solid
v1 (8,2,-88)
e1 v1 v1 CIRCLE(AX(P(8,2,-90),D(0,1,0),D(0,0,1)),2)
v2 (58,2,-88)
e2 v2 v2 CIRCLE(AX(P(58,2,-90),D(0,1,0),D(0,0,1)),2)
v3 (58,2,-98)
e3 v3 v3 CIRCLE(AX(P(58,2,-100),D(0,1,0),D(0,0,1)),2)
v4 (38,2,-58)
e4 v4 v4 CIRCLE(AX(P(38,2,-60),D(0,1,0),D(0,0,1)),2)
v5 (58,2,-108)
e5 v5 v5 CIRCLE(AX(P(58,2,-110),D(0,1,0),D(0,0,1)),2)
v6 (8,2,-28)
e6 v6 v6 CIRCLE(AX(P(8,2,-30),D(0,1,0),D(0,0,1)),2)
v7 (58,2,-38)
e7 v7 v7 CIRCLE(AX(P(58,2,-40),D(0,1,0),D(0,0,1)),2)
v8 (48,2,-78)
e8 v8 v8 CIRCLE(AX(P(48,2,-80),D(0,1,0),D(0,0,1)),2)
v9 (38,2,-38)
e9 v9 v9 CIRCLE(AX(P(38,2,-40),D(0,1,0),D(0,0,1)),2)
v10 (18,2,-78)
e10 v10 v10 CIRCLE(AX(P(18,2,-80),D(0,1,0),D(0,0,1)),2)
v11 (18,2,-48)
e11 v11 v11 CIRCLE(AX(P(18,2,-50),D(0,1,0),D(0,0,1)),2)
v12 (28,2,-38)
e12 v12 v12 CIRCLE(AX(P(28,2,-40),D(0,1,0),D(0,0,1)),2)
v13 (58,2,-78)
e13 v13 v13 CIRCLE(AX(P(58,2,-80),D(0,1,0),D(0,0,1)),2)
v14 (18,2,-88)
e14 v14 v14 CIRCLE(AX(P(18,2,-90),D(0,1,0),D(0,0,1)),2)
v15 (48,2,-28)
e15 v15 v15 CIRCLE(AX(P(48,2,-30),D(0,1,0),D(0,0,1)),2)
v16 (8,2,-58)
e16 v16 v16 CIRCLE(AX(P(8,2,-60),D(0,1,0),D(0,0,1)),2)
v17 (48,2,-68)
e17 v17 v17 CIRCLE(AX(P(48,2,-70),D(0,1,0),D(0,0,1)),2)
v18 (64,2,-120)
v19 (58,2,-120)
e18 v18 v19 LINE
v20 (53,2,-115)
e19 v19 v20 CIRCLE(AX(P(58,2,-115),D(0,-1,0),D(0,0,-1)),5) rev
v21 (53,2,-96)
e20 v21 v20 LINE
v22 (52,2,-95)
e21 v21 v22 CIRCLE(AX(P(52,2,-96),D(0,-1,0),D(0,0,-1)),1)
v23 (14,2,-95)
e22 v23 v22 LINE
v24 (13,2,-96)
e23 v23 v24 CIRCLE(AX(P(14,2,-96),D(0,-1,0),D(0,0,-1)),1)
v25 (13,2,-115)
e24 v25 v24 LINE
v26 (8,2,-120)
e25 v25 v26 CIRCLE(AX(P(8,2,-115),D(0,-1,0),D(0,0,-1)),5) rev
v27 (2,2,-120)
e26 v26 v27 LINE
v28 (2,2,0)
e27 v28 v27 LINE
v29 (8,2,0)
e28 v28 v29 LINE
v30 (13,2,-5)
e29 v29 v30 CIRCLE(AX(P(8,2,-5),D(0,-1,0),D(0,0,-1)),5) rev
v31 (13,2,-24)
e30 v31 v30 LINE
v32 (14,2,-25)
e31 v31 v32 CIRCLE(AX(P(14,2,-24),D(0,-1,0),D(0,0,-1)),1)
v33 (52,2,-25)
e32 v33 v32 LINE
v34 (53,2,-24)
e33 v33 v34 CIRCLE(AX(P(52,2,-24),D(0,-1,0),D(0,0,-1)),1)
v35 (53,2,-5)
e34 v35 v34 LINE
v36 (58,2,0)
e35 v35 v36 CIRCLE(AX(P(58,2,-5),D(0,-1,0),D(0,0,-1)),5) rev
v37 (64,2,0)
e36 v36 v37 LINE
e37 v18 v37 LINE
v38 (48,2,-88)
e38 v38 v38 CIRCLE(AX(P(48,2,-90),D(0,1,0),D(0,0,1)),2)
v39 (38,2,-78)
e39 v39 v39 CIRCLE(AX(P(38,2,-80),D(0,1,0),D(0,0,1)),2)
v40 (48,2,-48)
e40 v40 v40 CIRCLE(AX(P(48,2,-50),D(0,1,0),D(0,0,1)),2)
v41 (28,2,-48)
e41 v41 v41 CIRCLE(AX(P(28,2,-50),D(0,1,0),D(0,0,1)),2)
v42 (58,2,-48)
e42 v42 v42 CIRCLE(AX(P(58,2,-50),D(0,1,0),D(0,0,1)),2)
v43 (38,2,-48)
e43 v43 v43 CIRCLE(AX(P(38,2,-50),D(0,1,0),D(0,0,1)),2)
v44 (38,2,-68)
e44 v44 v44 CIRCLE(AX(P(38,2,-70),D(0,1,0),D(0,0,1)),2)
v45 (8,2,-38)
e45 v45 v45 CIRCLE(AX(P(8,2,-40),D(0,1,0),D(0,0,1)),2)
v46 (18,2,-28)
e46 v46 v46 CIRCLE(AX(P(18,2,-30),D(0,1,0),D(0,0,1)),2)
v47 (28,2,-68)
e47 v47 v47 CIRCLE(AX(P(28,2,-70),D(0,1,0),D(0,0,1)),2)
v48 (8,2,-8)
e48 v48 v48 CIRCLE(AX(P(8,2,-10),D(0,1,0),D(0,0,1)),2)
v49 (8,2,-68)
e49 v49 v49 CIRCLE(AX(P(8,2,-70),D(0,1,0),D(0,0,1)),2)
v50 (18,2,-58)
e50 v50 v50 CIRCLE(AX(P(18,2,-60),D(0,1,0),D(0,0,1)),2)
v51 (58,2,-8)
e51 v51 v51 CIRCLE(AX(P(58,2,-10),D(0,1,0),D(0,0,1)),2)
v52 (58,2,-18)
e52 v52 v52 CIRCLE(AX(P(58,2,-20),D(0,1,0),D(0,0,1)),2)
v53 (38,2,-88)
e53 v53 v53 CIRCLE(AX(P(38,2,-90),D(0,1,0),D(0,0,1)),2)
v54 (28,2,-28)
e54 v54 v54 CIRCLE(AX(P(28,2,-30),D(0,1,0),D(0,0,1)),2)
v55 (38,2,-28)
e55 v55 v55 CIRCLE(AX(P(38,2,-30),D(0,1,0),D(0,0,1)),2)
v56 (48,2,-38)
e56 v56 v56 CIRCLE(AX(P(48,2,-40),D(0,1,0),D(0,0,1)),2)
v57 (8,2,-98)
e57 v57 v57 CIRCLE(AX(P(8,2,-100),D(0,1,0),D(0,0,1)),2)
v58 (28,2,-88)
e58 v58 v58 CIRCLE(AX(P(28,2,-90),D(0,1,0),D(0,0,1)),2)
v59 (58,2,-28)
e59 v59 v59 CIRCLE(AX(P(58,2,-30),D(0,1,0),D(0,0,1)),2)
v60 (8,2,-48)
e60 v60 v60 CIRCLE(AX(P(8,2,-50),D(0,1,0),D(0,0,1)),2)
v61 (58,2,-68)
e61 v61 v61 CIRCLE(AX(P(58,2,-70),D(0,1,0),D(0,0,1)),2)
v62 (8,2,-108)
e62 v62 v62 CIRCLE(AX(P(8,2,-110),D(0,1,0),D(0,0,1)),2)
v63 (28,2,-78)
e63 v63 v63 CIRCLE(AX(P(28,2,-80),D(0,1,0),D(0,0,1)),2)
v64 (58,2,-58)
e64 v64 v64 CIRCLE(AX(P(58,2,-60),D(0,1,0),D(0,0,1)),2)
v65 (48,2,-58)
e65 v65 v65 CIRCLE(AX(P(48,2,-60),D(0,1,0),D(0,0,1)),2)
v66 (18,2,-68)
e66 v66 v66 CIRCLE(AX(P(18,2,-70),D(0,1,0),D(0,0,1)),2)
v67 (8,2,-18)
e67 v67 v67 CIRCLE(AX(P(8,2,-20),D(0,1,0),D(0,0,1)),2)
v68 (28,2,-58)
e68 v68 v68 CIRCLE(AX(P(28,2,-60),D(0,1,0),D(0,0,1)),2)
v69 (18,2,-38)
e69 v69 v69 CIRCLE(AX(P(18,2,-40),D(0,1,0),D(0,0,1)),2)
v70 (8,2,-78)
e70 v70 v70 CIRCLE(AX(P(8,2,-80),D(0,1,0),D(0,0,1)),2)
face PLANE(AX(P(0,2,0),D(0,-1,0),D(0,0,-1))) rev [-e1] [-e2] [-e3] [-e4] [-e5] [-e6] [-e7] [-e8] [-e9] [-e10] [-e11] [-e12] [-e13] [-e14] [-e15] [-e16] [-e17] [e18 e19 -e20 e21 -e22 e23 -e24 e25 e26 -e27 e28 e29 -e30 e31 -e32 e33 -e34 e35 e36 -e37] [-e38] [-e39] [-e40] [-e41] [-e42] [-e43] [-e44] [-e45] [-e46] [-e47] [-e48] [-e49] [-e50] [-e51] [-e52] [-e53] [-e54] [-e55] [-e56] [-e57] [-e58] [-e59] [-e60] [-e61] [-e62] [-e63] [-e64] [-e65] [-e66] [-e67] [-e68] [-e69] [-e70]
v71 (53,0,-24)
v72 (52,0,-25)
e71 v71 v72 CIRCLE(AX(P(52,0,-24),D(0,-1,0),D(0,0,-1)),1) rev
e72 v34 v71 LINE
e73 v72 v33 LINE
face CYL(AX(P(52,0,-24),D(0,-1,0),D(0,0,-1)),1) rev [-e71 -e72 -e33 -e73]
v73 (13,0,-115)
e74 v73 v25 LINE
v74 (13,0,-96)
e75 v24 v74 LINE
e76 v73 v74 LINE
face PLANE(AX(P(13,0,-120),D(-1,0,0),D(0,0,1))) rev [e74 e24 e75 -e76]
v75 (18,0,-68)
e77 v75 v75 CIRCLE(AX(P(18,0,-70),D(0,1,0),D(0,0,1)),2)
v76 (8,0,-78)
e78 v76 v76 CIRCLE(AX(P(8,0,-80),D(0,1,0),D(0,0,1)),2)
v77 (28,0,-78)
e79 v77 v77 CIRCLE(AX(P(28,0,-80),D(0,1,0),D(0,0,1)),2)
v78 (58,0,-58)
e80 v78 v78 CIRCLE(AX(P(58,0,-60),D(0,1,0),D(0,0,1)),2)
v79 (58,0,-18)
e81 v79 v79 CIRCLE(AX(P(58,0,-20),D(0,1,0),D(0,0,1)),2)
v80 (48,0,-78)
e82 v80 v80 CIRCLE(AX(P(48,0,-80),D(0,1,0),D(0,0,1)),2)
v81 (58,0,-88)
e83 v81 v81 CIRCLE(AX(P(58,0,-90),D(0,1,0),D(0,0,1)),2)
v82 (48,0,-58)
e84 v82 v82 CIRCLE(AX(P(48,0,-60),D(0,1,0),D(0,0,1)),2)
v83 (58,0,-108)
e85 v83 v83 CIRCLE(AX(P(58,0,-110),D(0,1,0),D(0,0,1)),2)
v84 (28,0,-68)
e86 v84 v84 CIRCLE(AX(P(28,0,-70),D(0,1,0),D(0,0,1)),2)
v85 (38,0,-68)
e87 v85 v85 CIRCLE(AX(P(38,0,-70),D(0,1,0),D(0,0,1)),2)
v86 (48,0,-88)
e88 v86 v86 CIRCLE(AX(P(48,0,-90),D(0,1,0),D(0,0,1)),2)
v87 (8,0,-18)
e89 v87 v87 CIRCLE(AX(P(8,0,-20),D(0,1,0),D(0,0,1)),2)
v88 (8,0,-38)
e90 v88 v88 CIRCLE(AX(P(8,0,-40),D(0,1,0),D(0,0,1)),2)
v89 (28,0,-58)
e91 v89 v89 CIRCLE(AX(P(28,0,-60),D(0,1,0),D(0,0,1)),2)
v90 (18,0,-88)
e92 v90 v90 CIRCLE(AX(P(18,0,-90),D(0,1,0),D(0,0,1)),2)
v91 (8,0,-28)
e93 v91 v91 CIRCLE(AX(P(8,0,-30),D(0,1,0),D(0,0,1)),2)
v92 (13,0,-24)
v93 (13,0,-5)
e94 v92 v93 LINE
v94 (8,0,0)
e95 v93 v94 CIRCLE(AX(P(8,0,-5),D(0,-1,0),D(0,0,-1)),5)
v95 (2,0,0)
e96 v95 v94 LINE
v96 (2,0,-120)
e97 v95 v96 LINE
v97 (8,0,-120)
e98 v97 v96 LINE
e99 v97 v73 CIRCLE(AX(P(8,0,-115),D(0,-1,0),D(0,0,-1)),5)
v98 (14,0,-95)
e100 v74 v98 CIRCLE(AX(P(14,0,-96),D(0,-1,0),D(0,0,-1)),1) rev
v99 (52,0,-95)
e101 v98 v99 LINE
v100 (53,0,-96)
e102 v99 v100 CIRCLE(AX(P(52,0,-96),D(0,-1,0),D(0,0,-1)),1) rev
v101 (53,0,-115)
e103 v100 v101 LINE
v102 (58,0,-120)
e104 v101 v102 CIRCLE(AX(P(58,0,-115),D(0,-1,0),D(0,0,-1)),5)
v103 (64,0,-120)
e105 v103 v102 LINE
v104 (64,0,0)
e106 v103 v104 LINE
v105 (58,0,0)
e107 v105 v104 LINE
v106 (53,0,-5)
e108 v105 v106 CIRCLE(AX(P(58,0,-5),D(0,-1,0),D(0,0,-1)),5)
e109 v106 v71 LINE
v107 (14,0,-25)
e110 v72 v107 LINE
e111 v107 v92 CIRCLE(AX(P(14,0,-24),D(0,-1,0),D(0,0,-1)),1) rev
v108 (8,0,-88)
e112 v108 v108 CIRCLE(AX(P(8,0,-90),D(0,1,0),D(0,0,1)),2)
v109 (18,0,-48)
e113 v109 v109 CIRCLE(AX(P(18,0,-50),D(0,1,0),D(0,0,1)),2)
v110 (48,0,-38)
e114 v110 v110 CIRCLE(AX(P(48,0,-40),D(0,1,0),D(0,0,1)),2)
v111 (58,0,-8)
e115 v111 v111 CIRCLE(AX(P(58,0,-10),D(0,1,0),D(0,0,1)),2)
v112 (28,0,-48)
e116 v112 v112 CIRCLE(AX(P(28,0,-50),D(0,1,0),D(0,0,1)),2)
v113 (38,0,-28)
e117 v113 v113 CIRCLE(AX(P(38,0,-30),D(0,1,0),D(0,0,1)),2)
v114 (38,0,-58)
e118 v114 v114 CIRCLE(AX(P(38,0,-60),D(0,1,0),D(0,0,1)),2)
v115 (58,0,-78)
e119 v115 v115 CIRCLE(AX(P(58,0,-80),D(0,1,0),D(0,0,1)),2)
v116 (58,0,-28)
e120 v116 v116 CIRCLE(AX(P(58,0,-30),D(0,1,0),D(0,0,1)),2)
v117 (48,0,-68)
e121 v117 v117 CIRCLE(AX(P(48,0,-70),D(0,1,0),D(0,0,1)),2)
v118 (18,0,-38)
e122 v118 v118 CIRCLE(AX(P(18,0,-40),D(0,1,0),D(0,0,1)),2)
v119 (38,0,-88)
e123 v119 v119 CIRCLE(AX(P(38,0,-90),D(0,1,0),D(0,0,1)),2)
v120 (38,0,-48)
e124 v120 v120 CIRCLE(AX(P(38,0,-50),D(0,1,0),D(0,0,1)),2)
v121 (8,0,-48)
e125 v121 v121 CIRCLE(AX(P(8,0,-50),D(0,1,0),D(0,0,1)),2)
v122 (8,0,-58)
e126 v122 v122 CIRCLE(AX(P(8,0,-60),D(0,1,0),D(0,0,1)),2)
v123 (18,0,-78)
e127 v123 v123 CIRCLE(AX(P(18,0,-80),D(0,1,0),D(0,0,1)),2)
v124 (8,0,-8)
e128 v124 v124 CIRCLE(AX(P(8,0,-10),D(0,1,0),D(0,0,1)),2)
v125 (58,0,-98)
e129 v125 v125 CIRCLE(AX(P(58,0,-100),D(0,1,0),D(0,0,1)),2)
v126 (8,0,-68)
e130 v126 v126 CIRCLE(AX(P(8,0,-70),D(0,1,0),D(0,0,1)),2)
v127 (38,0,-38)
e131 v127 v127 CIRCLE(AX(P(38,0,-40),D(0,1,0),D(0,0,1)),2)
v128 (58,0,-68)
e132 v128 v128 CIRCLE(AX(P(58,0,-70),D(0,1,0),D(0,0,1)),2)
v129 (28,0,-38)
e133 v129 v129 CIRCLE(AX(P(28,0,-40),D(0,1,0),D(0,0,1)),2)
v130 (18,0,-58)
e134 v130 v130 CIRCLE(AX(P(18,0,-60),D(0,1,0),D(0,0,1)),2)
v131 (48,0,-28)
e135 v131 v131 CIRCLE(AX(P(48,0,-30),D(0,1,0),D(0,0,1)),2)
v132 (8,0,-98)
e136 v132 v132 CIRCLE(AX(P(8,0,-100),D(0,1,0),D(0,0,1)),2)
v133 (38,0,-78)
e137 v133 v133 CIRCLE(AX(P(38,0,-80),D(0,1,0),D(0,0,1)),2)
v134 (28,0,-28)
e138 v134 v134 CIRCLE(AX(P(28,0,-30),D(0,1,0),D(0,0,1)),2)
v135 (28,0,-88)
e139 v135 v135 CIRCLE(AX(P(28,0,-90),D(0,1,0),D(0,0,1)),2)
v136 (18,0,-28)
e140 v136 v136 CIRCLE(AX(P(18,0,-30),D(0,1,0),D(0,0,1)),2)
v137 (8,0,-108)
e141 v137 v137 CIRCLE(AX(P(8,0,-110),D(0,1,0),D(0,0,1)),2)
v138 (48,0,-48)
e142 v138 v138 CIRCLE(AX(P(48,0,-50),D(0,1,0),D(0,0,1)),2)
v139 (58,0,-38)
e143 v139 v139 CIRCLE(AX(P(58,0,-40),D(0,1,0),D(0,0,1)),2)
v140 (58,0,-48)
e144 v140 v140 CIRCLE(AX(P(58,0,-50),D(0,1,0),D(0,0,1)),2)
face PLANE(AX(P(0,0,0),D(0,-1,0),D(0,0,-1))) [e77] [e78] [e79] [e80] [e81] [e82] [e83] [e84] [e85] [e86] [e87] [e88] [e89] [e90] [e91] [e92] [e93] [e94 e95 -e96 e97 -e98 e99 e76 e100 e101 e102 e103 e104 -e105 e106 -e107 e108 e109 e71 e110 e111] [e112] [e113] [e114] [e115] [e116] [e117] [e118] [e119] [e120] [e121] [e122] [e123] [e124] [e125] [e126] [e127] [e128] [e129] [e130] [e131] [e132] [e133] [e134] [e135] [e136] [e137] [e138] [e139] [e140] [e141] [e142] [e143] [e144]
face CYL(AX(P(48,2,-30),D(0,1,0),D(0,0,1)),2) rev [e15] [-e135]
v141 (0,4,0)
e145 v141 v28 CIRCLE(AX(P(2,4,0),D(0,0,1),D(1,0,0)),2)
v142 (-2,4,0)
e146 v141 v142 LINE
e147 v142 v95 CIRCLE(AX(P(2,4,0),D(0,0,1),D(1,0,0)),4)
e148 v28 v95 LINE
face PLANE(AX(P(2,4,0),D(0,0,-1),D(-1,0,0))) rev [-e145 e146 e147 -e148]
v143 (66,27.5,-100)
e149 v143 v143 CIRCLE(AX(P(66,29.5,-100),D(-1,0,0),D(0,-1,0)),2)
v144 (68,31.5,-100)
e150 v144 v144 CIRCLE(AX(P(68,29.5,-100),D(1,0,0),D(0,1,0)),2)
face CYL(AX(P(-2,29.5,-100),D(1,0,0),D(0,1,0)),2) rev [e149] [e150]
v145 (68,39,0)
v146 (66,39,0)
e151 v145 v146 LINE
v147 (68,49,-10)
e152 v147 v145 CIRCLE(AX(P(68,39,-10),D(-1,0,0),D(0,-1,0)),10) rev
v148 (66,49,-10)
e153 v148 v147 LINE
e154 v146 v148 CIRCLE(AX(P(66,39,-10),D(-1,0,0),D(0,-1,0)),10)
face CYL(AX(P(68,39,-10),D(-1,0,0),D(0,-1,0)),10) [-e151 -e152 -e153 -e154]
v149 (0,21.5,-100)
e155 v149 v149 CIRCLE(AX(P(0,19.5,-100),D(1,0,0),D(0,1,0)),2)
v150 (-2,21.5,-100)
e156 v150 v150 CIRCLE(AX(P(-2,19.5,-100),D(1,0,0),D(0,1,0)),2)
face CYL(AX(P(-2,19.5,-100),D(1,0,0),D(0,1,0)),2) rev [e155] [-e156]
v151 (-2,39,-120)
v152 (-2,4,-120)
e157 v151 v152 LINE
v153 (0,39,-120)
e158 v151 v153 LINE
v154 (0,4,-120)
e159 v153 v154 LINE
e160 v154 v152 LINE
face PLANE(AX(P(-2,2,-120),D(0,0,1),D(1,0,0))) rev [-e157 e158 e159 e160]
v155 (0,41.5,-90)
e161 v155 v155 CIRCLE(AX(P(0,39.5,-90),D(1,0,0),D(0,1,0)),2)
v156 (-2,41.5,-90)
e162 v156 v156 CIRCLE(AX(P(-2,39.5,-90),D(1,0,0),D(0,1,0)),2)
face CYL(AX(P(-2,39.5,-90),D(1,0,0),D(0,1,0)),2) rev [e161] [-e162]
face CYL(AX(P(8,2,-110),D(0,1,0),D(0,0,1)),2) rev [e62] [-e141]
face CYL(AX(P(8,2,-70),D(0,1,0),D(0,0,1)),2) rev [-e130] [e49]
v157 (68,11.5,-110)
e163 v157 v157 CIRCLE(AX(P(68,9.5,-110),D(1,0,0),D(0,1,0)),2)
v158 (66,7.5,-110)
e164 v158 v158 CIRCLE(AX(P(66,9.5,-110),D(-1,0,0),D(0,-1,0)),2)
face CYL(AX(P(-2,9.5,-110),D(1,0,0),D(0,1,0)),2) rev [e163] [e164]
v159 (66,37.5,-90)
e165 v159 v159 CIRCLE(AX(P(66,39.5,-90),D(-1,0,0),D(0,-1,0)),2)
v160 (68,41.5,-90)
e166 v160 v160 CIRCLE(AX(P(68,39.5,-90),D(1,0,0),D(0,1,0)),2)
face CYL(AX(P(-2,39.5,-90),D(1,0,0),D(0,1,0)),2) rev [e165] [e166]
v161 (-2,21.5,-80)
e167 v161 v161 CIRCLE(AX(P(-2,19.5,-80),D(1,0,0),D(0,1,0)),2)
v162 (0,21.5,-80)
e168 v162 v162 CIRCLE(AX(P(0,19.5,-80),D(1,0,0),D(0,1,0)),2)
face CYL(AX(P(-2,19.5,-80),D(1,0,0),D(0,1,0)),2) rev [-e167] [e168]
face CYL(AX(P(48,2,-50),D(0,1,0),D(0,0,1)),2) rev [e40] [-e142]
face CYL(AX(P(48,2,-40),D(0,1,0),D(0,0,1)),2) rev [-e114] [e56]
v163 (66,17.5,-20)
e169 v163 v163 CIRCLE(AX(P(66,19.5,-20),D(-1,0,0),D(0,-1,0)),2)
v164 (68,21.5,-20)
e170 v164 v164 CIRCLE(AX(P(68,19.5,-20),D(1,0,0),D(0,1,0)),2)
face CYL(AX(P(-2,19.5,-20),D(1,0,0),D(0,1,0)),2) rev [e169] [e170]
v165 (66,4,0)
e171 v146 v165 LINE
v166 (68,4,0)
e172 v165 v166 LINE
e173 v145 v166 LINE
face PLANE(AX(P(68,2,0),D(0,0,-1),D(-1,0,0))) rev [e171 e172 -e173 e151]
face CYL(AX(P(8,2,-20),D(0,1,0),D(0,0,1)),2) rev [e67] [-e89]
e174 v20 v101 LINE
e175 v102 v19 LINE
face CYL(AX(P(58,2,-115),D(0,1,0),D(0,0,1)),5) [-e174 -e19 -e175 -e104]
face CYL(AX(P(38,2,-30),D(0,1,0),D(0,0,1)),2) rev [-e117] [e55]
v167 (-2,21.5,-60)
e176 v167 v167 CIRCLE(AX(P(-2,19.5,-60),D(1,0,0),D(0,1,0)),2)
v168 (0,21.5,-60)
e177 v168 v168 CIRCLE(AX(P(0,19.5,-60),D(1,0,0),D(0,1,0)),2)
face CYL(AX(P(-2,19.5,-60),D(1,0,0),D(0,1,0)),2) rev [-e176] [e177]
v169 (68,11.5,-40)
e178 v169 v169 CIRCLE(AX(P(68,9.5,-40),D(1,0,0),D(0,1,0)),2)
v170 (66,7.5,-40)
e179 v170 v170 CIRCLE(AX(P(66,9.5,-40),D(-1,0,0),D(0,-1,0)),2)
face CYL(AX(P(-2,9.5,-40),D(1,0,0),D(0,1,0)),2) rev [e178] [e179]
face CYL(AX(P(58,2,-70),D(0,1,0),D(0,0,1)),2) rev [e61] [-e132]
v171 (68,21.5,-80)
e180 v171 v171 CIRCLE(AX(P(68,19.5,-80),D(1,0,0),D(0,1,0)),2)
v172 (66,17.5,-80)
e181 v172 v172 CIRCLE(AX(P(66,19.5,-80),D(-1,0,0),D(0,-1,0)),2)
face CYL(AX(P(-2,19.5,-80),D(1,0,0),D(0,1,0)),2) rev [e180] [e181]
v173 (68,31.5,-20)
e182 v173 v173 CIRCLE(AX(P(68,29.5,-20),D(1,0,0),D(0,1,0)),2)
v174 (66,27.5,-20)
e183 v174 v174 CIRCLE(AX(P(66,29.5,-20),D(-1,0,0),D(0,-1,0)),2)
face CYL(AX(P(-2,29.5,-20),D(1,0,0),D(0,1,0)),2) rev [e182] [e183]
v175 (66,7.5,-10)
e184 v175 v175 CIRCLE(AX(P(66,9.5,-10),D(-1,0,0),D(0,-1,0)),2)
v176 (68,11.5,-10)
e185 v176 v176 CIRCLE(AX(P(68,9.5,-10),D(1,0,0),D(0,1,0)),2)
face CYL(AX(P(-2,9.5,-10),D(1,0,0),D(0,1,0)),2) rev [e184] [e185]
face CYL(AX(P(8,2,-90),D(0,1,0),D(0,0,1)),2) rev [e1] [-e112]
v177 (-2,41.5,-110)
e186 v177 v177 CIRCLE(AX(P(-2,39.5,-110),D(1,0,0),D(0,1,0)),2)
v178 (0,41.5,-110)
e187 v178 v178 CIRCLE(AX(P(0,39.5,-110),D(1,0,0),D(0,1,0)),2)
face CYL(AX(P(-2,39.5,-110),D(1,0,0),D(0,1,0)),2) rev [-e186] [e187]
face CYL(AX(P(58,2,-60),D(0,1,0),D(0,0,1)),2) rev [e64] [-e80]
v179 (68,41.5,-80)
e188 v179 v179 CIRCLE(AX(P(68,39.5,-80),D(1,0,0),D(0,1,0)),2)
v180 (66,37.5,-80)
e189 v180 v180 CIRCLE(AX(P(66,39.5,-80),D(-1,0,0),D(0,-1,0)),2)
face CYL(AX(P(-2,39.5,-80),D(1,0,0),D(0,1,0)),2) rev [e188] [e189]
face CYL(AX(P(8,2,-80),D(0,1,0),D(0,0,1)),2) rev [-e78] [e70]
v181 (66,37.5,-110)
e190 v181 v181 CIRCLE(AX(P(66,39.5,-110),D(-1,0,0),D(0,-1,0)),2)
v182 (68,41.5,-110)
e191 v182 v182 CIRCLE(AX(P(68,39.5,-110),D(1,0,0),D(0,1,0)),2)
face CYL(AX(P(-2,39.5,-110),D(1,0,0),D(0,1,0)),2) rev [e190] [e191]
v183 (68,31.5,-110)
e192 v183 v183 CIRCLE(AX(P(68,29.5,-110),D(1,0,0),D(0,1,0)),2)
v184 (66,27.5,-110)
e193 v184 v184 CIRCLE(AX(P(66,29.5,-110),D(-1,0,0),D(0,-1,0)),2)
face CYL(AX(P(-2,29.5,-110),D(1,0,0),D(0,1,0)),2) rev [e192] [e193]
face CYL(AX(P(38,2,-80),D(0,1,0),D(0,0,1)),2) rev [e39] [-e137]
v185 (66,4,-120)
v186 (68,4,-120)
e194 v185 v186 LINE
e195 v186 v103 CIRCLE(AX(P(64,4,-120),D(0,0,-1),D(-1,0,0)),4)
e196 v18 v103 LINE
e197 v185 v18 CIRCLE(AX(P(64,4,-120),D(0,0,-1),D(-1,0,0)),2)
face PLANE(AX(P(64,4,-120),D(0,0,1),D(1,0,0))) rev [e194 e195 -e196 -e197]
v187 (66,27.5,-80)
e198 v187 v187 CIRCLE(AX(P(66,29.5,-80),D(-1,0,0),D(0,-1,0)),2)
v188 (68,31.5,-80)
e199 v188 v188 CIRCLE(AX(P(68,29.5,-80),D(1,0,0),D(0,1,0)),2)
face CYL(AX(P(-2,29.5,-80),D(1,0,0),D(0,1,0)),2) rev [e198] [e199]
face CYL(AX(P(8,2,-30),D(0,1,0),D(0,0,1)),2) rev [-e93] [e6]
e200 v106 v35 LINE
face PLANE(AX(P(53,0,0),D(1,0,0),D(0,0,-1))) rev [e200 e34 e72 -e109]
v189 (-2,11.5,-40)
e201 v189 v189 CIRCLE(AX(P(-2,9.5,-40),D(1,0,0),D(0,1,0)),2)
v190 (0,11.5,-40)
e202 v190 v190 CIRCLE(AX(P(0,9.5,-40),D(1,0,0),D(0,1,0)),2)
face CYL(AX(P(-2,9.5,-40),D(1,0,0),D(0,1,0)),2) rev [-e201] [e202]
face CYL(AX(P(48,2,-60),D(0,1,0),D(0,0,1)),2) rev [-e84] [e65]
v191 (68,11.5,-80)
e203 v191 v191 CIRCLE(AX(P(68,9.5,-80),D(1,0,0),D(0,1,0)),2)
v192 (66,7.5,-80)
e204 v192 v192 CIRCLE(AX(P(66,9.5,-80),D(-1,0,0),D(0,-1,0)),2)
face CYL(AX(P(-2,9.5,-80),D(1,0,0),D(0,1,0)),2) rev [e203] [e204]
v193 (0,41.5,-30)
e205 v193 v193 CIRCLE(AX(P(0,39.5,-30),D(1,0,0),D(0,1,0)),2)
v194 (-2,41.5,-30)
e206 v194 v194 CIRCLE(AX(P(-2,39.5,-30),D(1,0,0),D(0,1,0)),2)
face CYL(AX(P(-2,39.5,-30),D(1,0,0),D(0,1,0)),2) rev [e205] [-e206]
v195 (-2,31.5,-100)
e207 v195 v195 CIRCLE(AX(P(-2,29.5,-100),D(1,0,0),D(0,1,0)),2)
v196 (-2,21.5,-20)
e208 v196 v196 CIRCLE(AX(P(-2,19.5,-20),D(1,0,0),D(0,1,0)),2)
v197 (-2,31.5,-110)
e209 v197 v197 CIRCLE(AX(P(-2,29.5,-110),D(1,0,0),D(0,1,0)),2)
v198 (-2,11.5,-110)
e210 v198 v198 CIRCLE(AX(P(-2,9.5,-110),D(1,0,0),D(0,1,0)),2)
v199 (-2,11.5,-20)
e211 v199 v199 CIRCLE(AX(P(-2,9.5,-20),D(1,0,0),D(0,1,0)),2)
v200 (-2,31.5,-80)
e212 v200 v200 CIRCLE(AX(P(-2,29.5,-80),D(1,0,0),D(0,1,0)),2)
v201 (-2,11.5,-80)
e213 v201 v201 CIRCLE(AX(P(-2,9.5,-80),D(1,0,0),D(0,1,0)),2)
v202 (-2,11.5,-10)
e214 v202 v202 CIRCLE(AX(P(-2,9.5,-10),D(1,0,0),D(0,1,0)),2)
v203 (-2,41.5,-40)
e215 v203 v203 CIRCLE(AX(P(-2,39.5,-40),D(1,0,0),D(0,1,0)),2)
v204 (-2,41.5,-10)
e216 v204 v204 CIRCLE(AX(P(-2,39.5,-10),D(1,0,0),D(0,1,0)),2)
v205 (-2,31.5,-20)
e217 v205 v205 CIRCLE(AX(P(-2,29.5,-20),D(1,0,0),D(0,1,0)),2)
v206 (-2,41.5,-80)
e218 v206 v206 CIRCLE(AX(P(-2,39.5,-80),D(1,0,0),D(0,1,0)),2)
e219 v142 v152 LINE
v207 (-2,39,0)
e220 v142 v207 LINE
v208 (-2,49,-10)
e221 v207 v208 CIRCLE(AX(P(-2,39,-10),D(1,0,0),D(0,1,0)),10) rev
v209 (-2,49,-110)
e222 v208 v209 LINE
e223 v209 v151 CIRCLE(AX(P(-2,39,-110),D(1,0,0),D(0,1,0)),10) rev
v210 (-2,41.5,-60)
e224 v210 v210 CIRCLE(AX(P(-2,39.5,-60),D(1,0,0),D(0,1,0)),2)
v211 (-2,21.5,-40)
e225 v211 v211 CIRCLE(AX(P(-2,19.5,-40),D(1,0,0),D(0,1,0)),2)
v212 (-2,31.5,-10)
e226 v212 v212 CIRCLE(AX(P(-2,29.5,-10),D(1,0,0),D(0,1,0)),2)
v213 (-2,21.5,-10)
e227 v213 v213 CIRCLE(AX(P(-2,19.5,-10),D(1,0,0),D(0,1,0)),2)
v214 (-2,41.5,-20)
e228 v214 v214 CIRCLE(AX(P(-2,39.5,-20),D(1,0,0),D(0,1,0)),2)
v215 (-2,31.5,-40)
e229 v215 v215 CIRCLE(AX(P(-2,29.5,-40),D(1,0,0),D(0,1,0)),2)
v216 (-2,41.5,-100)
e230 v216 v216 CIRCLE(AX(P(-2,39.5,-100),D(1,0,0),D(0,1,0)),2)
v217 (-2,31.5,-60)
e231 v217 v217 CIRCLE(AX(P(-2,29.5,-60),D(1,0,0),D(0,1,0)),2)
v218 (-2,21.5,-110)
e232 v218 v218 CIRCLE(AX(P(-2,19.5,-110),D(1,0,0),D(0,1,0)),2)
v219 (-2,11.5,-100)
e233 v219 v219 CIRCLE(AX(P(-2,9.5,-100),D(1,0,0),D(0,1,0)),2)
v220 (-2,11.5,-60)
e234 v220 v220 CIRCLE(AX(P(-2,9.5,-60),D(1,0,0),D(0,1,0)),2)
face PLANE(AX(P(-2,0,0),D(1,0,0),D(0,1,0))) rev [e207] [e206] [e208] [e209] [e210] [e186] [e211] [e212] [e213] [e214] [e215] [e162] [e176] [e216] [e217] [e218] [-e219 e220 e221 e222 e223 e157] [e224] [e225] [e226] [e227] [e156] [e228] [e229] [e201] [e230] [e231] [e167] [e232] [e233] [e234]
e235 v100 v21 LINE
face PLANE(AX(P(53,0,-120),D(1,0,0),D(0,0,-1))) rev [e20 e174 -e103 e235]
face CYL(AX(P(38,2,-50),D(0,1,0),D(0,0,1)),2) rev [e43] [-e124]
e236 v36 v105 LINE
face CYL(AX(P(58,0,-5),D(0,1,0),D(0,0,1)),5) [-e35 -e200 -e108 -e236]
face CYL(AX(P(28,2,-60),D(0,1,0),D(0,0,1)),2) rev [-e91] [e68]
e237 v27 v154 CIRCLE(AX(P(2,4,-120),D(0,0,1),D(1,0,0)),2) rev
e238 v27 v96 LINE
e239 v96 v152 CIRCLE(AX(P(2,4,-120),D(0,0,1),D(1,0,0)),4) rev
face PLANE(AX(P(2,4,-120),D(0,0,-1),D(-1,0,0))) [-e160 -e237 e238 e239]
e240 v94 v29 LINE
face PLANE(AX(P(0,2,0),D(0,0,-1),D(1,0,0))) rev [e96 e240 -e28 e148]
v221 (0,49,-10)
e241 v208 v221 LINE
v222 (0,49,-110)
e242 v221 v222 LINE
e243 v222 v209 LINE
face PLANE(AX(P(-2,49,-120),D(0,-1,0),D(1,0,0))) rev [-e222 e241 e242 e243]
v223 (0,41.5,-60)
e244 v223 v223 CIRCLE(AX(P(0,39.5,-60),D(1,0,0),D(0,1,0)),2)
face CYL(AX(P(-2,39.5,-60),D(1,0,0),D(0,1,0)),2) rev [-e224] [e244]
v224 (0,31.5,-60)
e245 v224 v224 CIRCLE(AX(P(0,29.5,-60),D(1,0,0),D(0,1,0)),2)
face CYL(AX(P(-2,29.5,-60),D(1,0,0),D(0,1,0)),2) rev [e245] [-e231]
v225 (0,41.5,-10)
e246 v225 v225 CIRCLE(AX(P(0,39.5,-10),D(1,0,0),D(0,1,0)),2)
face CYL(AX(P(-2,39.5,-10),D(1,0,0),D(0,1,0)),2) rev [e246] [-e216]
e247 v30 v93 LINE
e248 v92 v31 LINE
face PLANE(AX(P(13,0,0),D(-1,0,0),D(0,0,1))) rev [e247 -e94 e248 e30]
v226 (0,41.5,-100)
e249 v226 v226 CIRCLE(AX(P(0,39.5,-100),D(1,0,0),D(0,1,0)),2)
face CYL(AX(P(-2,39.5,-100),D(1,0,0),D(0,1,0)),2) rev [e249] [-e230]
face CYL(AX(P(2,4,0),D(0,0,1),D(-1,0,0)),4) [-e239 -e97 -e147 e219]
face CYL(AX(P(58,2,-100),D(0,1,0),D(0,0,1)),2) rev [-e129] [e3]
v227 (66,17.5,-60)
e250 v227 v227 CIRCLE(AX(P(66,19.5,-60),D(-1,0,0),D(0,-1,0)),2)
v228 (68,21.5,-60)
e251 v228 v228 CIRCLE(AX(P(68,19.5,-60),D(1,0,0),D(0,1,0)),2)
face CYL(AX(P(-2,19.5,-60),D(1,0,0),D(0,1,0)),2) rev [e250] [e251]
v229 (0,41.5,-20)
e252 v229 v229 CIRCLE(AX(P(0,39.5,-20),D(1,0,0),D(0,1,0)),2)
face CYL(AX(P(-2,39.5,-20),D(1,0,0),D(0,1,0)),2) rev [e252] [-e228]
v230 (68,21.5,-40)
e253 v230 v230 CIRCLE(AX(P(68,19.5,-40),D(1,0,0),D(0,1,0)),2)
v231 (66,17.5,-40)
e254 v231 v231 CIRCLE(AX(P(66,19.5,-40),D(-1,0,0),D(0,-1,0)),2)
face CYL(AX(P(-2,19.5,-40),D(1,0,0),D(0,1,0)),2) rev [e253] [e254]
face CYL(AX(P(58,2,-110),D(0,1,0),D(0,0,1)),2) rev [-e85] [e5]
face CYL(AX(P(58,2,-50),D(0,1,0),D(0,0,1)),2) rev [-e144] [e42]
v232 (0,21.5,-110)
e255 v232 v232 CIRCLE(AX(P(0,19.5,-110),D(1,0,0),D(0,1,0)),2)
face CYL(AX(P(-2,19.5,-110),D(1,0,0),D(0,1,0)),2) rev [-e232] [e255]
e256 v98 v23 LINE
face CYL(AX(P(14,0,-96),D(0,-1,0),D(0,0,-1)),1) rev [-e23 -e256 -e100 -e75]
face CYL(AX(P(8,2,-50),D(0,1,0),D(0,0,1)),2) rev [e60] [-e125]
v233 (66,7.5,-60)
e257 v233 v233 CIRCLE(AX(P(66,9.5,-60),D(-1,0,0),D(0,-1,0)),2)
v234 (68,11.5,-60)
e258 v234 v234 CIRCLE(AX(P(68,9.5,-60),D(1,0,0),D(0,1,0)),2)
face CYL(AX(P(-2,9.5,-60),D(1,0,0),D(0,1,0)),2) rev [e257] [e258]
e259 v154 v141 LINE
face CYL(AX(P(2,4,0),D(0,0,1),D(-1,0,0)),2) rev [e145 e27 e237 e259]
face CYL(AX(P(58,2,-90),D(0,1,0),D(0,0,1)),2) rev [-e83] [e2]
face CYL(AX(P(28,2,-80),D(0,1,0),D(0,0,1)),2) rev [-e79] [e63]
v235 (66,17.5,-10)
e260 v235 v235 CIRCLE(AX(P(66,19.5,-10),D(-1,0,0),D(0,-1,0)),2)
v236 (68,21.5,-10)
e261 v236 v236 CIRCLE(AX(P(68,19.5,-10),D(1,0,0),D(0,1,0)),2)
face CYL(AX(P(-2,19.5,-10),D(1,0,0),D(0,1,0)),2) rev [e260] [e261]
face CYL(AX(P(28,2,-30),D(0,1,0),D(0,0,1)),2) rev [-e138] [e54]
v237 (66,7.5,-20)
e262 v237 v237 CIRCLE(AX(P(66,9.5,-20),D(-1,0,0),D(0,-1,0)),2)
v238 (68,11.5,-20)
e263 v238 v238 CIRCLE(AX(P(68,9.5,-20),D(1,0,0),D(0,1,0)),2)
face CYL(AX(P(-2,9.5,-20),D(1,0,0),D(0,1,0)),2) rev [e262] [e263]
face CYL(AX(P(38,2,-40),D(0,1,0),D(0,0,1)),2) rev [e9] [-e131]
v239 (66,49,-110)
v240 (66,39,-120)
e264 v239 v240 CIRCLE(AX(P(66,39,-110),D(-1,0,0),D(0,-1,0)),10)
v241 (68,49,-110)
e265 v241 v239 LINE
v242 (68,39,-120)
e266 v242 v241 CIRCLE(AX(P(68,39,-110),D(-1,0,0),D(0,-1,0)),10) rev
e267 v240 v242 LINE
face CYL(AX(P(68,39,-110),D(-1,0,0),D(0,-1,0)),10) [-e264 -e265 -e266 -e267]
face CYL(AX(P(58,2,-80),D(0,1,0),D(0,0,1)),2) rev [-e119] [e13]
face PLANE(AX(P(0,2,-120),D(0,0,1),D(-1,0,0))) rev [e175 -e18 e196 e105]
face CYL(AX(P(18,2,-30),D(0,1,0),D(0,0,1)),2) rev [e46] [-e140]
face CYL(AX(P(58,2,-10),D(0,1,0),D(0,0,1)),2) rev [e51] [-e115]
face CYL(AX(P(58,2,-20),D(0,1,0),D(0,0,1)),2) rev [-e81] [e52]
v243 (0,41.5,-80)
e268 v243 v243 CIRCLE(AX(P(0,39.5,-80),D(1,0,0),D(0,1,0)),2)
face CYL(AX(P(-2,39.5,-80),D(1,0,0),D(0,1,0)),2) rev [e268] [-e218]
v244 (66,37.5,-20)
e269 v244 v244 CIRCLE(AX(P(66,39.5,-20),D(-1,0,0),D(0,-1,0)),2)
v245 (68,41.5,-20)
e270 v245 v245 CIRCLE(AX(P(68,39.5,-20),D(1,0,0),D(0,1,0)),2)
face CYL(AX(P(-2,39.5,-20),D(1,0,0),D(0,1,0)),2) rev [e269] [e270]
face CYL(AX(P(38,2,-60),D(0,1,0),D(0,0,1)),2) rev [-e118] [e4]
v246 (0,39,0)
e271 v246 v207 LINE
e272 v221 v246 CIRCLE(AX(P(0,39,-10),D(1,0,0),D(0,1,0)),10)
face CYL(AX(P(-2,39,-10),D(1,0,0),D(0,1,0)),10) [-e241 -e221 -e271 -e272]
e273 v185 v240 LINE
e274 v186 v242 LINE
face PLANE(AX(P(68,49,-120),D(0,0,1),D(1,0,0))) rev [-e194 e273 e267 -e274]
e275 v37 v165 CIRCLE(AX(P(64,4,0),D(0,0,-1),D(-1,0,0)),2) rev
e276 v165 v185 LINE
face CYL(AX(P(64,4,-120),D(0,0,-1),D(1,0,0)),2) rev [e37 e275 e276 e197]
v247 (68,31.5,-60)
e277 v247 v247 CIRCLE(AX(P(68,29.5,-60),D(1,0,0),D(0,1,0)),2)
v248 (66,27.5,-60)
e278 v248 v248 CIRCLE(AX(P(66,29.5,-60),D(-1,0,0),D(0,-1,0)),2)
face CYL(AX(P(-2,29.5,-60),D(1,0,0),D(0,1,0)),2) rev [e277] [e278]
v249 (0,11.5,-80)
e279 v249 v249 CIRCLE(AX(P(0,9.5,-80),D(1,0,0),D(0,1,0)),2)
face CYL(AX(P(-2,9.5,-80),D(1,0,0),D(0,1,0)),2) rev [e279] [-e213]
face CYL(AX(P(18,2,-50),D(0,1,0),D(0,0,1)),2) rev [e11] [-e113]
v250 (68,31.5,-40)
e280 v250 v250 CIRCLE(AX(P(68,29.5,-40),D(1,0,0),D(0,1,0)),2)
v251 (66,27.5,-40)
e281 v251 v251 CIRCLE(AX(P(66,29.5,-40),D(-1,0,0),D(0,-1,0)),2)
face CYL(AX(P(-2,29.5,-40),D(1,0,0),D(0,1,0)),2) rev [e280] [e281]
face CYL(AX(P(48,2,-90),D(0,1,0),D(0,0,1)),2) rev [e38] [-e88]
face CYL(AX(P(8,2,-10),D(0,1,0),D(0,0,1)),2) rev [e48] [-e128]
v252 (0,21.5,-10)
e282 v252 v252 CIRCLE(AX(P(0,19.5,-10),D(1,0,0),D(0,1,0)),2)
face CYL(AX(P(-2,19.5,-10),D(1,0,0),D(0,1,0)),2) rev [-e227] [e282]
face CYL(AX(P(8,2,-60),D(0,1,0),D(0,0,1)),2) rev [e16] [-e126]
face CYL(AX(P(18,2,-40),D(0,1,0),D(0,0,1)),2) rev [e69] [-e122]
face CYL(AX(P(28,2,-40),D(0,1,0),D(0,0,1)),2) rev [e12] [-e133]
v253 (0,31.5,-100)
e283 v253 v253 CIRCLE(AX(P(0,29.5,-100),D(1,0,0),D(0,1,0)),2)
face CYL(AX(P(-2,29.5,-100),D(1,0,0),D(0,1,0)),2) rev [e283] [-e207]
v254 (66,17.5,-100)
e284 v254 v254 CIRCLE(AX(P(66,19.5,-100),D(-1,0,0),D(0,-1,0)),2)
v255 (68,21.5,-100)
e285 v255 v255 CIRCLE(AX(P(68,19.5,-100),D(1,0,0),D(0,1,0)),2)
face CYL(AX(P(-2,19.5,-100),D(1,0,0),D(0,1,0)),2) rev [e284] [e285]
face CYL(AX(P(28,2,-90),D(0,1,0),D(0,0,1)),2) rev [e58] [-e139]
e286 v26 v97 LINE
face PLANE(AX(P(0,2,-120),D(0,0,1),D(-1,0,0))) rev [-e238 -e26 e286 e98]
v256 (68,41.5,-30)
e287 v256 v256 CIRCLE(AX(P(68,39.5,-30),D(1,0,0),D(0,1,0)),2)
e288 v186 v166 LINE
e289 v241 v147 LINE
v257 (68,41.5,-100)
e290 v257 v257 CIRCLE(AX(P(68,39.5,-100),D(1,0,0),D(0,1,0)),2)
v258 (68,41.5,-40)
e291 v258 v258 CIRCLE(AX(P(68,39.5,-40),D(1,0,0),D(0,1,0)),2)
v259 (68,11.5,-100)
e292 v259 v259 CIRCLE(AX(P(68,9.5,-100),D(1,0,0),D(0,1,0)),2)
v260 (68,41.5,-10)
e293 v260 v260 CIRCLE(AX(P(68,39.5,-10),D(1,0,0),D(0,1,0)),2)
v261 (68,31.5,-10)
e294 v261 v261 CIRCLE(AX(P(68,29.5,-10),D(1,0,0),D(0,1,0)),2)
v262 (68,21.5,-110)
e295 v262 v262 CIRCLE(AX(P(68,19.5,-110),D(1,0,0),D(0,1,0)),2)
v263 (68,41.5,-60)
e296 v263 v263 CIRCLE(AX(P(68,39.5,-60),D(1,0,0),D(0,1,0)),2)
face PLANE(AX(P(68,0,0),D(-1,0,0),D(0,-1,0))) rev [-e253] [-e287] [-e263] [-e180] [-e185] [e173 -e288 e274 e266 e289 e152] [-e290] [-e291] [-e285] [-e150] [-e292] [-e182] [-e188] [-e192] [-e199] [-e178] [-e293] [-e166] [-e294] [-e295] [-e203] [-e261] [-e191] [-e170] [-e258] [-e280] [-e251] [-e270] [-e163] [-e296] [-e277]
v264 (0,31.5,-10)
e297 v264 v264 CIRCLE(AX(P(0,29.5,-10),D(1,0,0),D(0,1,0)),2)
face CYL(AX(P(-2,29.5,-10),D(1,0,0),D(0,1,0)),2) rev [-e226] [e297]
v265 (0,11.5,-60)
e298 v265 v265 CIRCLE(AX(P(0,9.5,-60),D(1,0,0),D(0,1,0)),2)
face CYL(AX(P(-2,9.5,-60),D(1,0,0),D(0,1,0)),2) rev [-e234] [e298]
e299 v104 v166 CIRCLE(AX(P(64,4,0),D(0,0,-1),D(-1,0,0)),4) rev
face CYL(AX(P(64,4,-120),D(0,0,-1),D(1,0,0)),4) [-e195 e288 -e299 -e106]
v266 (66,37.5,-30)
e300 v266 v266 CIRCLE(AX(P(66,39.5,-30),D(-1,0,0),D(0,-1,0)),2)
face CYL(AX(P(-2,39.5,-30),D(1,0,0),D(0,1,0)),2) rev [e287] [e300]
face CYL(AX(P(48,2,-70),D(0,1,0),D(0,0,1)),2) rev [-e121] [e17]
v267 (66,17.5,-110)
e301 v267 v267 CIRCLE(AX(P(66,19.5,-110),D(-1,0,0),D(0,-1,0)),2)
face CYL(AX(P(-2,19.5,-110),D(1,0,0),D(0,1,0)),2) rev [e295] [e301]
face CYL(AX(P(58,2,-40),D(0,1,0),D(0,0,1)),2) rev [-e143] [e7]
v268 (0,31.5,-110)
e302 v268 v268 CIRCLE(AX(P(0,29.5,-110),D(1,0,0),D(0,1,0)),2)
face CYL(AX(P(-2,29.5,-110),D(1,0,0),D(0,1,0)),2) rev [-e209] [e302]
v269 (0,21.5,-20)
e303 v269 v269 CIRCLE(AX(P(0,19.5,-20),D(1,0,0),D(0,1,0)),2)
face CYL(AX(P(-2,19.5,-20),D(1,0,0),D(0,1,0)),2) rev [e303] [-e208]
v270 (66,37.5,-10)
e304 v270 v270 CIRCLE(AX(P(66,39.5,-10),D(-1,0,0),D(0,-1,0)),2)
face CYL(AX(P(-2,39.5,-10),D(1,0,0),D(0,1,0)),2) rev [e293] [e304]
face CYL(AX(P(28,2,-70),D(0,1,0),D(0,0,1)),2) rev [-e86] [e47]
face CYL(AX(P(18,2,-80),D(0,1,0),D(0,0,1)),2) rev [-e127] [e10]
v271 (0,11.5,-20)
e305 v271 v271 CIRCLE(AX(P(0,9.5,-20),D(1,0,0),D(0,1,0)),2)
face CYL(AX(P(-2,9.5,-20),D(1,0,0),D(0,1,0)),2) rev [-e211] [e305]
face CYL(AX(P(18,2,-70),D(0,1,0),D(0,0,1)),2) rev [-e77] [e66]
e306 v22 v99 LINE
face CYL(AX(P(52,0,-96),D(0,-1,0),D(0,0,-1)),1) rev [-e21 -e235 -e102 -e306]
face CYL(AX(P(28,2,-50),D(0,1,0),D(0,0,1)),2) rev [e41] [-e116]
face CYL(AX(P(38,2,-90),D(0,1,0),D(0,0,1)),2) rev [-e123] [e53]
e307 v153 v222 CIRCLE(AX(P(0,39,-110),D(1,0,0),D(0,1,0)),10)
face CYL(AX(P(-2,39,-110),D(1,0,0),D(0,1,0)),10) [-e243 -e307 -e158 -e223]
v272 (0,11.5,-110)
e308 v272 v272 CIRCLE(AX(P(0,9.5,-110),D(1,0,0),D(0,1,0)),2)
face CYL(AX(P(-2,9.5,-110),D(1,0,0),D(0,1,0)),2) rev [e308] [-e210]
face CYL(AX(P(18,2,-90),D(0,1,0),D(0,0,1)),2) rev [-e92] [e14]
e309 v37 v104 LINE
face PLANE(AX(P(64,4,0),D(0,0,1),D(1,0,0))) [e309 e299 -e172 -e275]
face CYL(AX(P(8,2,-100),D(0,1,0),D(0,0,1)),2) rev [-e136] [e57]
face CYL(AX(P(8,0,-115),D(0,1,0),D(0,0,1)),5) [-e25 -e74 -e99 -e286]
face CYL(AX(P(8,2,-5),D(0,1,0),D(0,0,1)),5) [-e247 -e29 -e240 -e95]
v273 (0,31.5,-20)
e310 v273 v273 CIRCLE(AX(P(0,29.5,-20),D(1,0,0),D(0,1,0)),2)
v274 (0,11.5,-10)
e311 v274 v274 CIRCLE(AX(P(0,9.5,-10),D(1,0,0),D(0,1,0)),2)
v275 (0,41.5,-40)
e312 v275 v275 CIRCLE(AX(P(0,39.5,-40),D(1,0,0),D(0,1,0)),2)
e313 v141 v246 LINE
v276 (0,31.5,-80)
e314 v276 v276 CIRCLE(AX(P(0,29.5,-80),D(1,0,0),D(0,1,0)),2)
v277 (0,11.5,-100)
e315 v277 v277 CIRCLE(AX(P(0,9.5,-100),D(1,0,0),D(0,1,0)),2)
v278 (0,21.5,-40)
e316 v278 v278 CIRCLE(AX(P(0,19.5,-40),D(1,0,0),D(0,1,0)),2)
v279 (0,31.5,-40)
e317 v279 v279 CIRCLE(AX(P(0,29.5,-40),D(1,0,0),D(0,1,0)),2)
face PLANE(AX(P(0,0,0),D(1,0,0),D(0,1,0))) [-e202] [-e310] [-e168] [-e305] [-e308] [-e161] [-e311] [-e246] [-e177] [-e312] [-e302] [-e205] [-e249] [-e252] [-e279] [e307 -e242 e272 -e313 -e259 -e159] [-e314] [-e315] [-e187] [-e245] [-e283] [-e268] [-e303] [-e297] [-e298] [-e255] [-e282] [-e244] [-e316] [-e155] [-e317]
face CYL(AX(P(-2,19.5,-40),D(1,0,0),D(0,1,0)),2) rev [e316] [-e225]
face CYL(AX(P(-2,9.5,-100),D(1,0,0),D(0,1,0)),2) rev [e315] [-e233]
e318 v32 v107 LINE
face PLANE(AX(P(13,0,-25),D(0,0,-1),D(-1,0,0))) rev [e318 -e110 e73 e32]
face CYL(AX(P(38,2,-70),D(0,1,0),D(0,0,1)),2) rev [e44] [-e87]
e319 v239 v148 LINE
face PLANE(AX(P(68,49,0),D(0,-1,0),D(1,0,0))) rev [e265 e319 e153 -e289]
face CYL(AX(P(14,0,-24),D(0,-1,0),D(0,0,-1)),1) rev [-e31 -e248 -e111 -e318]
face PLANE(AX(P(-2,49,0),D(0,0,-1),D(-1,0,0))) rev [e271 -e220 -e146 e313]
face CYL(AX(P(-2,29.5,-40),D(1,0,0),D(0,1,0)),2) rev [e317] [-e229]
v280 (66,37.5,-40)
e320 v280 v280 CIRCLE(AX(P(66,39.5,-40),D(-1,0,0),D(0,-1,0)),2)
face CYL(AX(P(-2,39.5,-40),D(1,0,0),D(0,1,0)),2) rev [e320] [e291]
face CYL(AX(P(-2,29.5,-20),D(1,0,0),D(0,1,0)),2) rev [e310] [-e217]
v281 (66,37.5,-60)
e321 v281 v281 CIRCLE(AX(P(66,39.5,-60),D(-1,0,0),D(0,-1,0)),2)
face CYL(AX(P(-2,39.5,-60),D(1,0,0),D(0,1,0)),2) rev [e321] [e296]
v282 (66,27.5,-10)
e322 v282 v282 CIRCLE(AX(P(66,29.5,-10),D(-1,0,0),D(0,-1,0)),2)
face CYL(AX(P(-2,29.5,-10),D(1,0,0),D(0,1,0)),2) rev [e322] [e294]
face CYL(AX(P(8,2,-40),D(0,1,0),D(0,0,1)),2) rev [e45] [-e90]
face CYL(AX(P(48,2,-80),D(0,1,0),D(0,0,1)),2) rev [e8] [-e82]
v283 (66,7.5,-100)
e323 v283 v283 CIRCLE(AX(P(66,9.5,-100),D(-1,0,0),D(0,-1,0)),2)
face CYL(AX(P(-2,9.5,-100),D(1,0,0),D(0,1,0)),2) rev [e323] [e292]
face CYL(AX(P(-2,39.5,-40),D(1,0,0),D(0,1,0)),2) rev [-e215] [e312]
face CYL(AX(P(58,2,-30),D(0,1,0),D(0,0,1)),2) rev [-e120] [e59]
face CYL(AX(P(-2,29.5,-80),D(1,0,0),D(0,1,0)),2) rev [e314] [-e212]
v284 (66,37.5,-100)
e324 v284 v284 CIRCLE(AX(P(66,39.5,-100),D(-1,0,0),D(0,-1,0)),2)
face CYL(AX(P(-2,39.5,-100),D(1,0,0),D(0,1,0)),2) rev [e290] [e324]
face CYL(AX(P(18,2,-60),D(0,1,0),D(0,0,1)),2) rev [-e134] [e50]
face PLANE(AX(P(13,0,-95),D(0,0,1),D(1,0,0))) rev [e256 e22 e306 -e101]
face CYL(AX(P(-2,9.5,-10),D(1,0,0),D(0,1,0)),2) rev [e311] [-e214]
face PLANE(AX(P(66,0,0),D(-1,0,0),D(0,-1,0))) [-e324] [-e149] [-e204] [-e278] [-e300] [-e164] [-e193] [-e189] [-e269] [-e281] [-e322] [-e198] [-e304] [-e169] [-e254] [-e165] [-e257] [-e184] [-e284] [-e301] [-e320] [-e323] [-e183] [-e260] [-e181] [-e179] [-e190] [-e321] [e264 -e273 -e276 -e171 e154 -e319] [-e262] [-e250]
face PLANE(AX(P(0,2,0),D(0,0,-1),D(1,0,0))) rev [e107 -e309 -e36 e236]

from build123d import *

# Parameters (mm, degrees)
SKETCH1_W                      = 66
SKETCH1_H                      = 120
BOSS_EXTRUDE1_DEPTH            = 2
SKETCH2_R                      = 2
CUT_EXTRUDE1_DEPTH             = 137.967149346
EDGE_FLANGE1_STRIP_W           = 12
EDGE_FLANGE1_STRIP_H           = 2
EDGE_FLANGE1_STRIP_CUT_DEPTH   = 120
EDGE_FLANGE1_STRIP_2_W         = 12
EDGE_FLANGE1_STRIP_2_H         = 2
EDGE_FLANGE1_STRIP_CUT_2_DEPTH = 120
EDGE_FLANGE1_DEPTH             = 120
EDGE_FLANGE1_BEND_DEPTH        = 120
SKETCH24_W                     = 40
SKETCH24_H                     = 25
CUT_EXTRUDE6_DEPTH             = 146.715476186
FILLET1_R                      = 10
FILLET2_R                      = 5
FILLET3_R                      = 1
SKETCH25_R                     = 2
CUT_EXTRUDE8_DEPTH             = 148.312592809


# Sheet-metal steps are written as plain solids
with BuildPart() as part:
    # Sketch1 → Boss-Extrude1 (new body)
    with BuildSketch(Plane(origin=(0, 0, 0), x_dir=(1, 0, 0), z_dir=(0, 1, 0))):
        with Locations((33, 60)):
            Rectangle(SKETCH1_W, SKETCH1_H)
    extrude(amount=BOSS_EXTRUDE1_DEPTH)

    # Sketch2 → Cut-Extrude1 (cut, through all)
    with BuildSketch(Plane(origin=(0, 2, 0), x_dir=(1, 0, 0), z_dir=(0, 1, 0))):
        with Locations(Location((8, 110, 0), (0, 0, 270))):
            Circle(SKETCH2_R)
        with Locations(Location((18, 110, 0), (0, 0, 270))):
            Circle(SKETCH2_R)
        with Locations(Location((28, 110, 0), (0, 0, 270))):
            Circle(SKETCH2_R)
        with Locations(Location((38, 110, 0), (0, 0, 270))):
            Circle(SKETCH2_R)
        with Locations(Location((48, 110, 0), (0, 0, 270))):
            Circle(SKETCH2_R)
        with Locations(Location((58, 110, 0), (0, 0, 270))):
            Circle(SKETCH2_R)
        with Locations(Location((18, 100, 0), (0, 0, 270))):
            Circle(SKETCH2_R)
        with Locations(Location((28, 100, 0), (0, 0, 270))):
            Circle(SKETCH2_R)
        with Locations(Location((38, 100, 0), (0, 0, 270))):
            Circle(SKETCH2_R)
        with Locations(Location((48, 100, 0), (0, 0, 270))):
            Circle(SKETCH2_R)
        with Locations(Location((58, 100, 0), (0, 0, 270))):
            Circle(SKETCH2_R)
        with Locations(Location((18, 90, 0), (0, 0, 270))):
            Circle(SKETCH2_R)
        with Locations(Location((28, 90, 0), (0, 0, 270))):
            Circle(SKETCH2_R)
        with Locations(Location((38, 90, 0), (0, 0, 270))):
            Circle(SKETCH2_R)
        with Locations(Location((48, 90, 0), (0, 0, 270))):
            Circle(SKETCH2_R)
        with Locations(Location((58, 90, 0), (0, 0, 270))):
            Circle(SKETCH2_R)
        with Locations(Location((18, 80, 0), (0, 0, 270))):
            Circle(SKETCH2_R)
        with Locations(Location((28, 80, 0), (0, 0, 270))):
            Circle(SKETCH2_R)
        with Locations(Location((38, 80, 0), (0, 0, 270))):
            Circle(SKETCH2_R)
        with Locations(Location((48, 80, 0), (0, 0, 270))):
            Circle(SKETCH2_R)
        with Locations(Location((58, 80, 0), (0, 0, 270))):
            Circle(SKETCH2_R)
        with Locations(Location((18, 70, 0), (0, 0, 270))):
            Circle(SKETCH2_R)
        with Locations(Location((28, 70, 0), (0, 0, 270))):
            Circle(SKETCH2_R)
        with Locations(Location((38, 70, 0), (0, 0, 270))):
            Circle(SKETCH2_R)
        with Locations(Location((48, 70, 0), (0, 0, 270))):
            Circle(SKETCH2_R)
        with Locations(Location((58, 70, 0), (0, 0, 270))):
            Circle(SKETCH2_R)
        with Locations(Location((18, 60, 0), (0, 0, 270))):
            Circle(SKETCH2_R)
        with Locations(Location((28, 60, 0), (0, 0, 270))):
            Circle(SKETCH2_R)
        with Locations(Location((38, 60, 0), (0, 0, 270))):
            Circle(SKETCH2_R)
        with Locations(Location((48, 60, 0), (0, 0, 270))):
            Circle(SKETCH2_R)
        with Locations(Location((58, 60, 0), (0, 0, 270))):
            Circle(SKETCH2_R)
        with Locations(Location((18, 50, 0), (0, 0, 270))):
            Circle(SKETCH2_R)
        with Locations(Location((28, 50, 0), (0, 0, 270))):
            Circle(SKETCH2_R)
        with Locations(Location((38, 50, 0), (0, 0, 270))):
            Circle(SKETCH2_R)
        with Locations(Location((48, 50, 0), (0, 0, 270))):
            Circle(SKETCH2_R)
        with Locations(Location((58, 50, 0), (0, 0, 270))):
            Circle(SKETCH2_R)
        with Locations(Location((18, 40, 0), (0, 0, 270))):
            Circle(SKETCH2_R)
        with Locations(Location((28, 40, 0), (0, 0, 270))):
            Circle(SKETCH2_R)
        with Locations(Location((38, 40, 0), (0, 0, 270))):
            Circle(SKETCH2_R)
        with Locations(Location((48, 40, 0), (0, 0, 270))):
            Circle(SKETCH2_R)
        with Locations(Location((58, 40, 0), (0, 0, 270))):
            Circle(SKETCH2_R)
        with Locations(Location((18, 30, 0), (0, 0, 270))):
            Circle(SKETCH2_R)
        with Locations(Location((28, 30, 0), (0, 0, 270))):
            Circle(SKETCH2_R)
        with Locations(Location((38, 30, 0), (0, 0, 270))):
            Circle(SKETCH2_R)
        with Locations(Location((48, 30, 0), (0, 0, 270))):
            Circle(SKETCH2_R)
        with Locations(Location((58, 30, 0), (0, 0, 270))):
            Circle(SKETCH2_R)
        with Locations(Location((18, 20, 0), (0, 0, 270))):
            Circle(SKETCH2_R)
        with Locations(Location((28, 20, 0), (0, 0, 270))):
            Circle(SKETCH2_R)
        with Locations(Location((38, 20, 0), (0, 0, 270))):
            Circle(SKETCH2_R)
        with Locations(Location((48, 20, 0), (0, 0, 270))):
            Circle(SKETCH2_R)
        with Locations(Location((58, 20, 0), (0, 0, 270))):
            Circle(SKETCH2_R)
        with Locations(Location((18, 10, 0), (0, 0, 270))):
            Circle(SKETCH2_R)
        with Locations(Location((28, 10, 0), (0, 0, 270))):
            Circle(SKETCH2_R)
        with Locations(Location((38, 10, 0), (0, 0, 270))):
            Circle(SKETCH2_R)
        with Locations(Location((48, 10, 0), (0, 0, 270))):
            Circle(SKETCH2_R)
        with Locations(Location((58, 10, 0), (0, 0, 270))):
            Circle(SKETCH2_R)
        with Locations(Location((8, 100, 0), (0, 0, 270))):
            Circle(SKETCH2_R)
        with Locations(Location((8, 90, 0), (0, 0, 270))):
            Circle(SKETCH2_R)
        with Locations(Location((8, 80, 0), (0, 0, 270))):
            Circle(SKETCH2_R)
        with Locations(Location((8, 70, 0), (0, 0, 270))):
            Circle(SKETCH2_R)
        with Locations(Location((8, 60, 0), (0, 0, 270))):
            Circle(SKETCH2_R)
        with Locations(Location((8, 50, 0), (0, 0, 270))):
            Circle(SKETCH2_R)
        with Locations(Location((8, 40, 0), (0, 0, 270))):
            Circle(SKETCH2_R)
        with Locations(Location((8, 30, 0), (0, 0, 270))):
            Circle(SKETCH2_R)
        with Locations(Location((8, 20, 0), (0, 0, 270))):
            Circle(SKETCH2_R)
        with Locations(Location((8, 10, 0), (0, 0, 270))):
            Circle(SKETCH2_R)
    extrude(amount=-CUT_EXTRUDE1_DEPTH, mode=Mode.SUBTRACT)

    # Edge-Flange1 strip (across the edge) → Edge-Flange1 strip cut (cut)
    with BuildSketch(Plane(origin=(0, 2, -120), x_dir=(1, 0, 0), z_dir=(0, 0, 1))):
        with Locations((-4, -1)):
            Rectangle(EDGE_FLANGE1_STRIP_W, EDGE_FLANGE1_STRIP_H)
    extrude(amount=EDGE_FLANGE1_STRIP_CUT_DEPTH, mode=Mode.SUBTRACT)

    # Edge-Flange1 strip 2 (across the edge) → Edge-Flange1 strip cut 2 (cut)
    with BuildSketch(Plane(origin=(66, 2, 0), x_dir=(-1, 0, 0), z_dir=(0, 0, -1))):
        with Locations((-4, -1)):
            Rectangle(EDGE_FLANGE1_STRIP_2_W, EDGE_FLANGE1_STRIP_2_H)
    extrude(amount=EDGE_FLANGE1_STRIP_CUT_2_DEPTH, mode=Mode.SUBTRACT)

    # Edge-Flange1 section (across the edge) → Edge-Flange1 (add)
    with BuildSketch(Plane(origin=(0, 2, -120), x_dir=(1, 0, 0), z_dir=(0, 0, 1))):
        with BuildLine():
            Line((-2, 2), (-2, 47))
            Line((-2, 47), (0, 47))
            Line((0, 47), (0, 2))
            ThreePointArc((0, 2), (0.585786438, 0.585786438), (2, 0))
            Line((2, 0), (2, -2))
            ThreePointArc((2, -2), (-0.828427125, -0.828427125), (-2, 2))
        make_face()
    extrude(amount=EDGE_FLANGE1_DEPTH)

    # Edge-Flange1 section 2 (across the edge) → Edge-Flange1 bend (add)
    with BuildSketch(Plane(origin=(66, 2, 0), x_dir=(-1, 0, 0), z_dir=(0, 0, -1))):
        with BuildLine():
            Line((-2, 2), (-2, 47))
            Line((-2, 47), (0, 47))
            Line((0, 47), (0, 2))
            ThreePointArc((0, 2), (0.585786438, 0.585786438), (2, 0))
            Line((2, 0), (2, -2))
            ThreePointArc((2, -2), (-0.828427125, -0.828427125), (-2, 2))
        make_face()
    extrude(amount=EDGE_FLANGE1_BEND_DEPTH)

    # Sketch24 → Cut-Extrude6 (cut, through all)
    with BuildSketch(Plane(origin=(0, 2, 0), x_dir=(1, 0, 0), z_dir=(0, 1, 0))):
        with Locations((33, 107.5)):
            Rectangle(SKETCH24_W, SKETCH24_H)
        with Locations((33, 12.5)):
            Rectangle(SKETCH24_W, SKETCH24_H)
    extrude(amount=-CUT_EXTRUDE6_DEPTH, mode=Mode.SUBTRACT)

    # Fillet1
    fillet1_edges = [part.edges().sort_by_distance(p)[0] for p in [
        (-1, 49, -120),
        (-1, 49, 0),
        (67, 49, 0),
        (67, 49, -120),
    ]]
    fillet(fillet1_edges, radius=FILLET1_R)

    # Fillet2
    fillet2_edges = [part.edges().sort_by_distance(p)[0] for p in [
        (13, 1, -120),
        (53, 1, -120),
        (53, 1, 0),
        (13, 1, 0),
    ]]
    fillet(fillet2_edges, radius=FILLET2_R)

    # Fillet3
    fillet3_edges = [part.edges().sort_by_distance(p)[0] for p in [
        (13, 1, -95),
        (53, 1, -95),
        (13, 1, -25),
        (53, 1, -25),
    ]]
    fillet(fillet3_edges, radius=FILLET3_R)

    # Sketch25 → Cut-Extrude8 (cut, through all)
    with BuildSketch(Plane(origin=(68, 0, 0), x_dir=(0, 0, -1), z_dir=(1, 0, 0))):
        with Locations(Location((10, 39.5, 0), (0, 0, 90))):
            Circle(SKETCH25_R)
        with Locations(Location((20, 39.5, 0), (0, 0, 90))):
            Circle(SKETCH25_R)
        with Locations(Location((30, 39.5, 0), (0, 0, 90))):
            Circle(SKETCH25_R)
        with Locations(Location((40, 39.5, 0), (0, 0, 90))):
            Circle(SKETCH25_R)
        with Locations(Location((60, 39.5, 0), (0, 0, 90))):
            Circle(SKETCH25_R)
        with Locations(Location((80, 39.5, 0), (0, 0, 90))):
            Circle(SKETCH25_R)
        with Locations(Location((90, 39.5, 0), (0, 0, 90))):
            Circle(SKETCH25_R)
        with Locations(Location((100, 39.5, 0), (0, 0, 90))):
            Circle(SKETCH25_R)
        with Locations(Location((110, 39.5, 0), (0, 0, 90))):
            Circle(SKETCH25_R)
        with Locations(Location((20, 29.5, 0), (0, 0, 90))):
            Circle(SKETCH25_R)
        with Locations(Location((40, 29.5, 0), (0, 0, 90))):
            Circle(SKETCH25_R)
        with Locations(Location((60, 29.5, 0), (0, 0, 90))):
            Circle(SKETCH25_R)
        with Locations(Location((80, 29.5, 0), (0, 0, 90))):
            Circle(SKETCH25_R)
        with Locations(Location((100, 29.5, 0), (0, 0, 90))):
            Circle(SKETCH25_R)
        with Locations(Location((110, 29.5, 0), (0, 0, 90))):
            Circle(SKETCH25_R)
        with Locations(Location((20, 19.5, 0), (0, 0, 90))):
            Circle(SKETCH25_R)
        with Locations(Location((40, 19.5, 0), (0, 0, 90))):
            Circle(SKETCH25_R)
        with Locations(Location((60, 19.5, 0), (0, 0, 90))):
            Circle(SKETCH25_R)
        with Locations(Location((80, 19.5, 0), (0, 0, 90))):
            Circle(SKETCH25_R)
        with Locations(Location((100, 19.5, 0), (0, 0, 90))):
            Circle(SKETCH25_R)
        with Locations(Location((110, 19.5, 0), (0, 0, 90))):
            Circle(SKETCH25_R)
        with Locations(Location((20, 9.5, 0), (0, 0, 90))):
            Circle(SKETCH25_R)
        with Locations(Location((40, 9.5, 0), (0, 0, 90))):
            Circle(SKETCH25_R)
        with Locations(Location((60, 9.5, 0), (0, 0, 90))):
            Circle(SKETCH25_R)
        with Locations(Location((80, 9.5, 0), (0, 0, 90))):
            Circle(SKETCH25_R)
        with Locations(Location((100, 9.5, 0), (0, 0, 90))):
            Circle(SKETCH25_R)
        with Locations(Location((110, 9.5, 0), (0, 0, 90))):
            Circle(SKETCH25_R)
        with Locations(Location((10, 29.5, 0), (0, 0, 90))):
            Circle(SKETCH25_R)
        with Locations(Location((10, 19.5, 0), (0, 0, 90))):
            Circle(SKETCH25_R)
        with Locations(Location((10, 9.5, 0), (0, 0, 90))):
            Circle(SKETCH25_R)
    extrude(amount=-CUT_EXTRUDE8_DEPTH, mode=Mode.SUBTRACT)


solid = part.part
